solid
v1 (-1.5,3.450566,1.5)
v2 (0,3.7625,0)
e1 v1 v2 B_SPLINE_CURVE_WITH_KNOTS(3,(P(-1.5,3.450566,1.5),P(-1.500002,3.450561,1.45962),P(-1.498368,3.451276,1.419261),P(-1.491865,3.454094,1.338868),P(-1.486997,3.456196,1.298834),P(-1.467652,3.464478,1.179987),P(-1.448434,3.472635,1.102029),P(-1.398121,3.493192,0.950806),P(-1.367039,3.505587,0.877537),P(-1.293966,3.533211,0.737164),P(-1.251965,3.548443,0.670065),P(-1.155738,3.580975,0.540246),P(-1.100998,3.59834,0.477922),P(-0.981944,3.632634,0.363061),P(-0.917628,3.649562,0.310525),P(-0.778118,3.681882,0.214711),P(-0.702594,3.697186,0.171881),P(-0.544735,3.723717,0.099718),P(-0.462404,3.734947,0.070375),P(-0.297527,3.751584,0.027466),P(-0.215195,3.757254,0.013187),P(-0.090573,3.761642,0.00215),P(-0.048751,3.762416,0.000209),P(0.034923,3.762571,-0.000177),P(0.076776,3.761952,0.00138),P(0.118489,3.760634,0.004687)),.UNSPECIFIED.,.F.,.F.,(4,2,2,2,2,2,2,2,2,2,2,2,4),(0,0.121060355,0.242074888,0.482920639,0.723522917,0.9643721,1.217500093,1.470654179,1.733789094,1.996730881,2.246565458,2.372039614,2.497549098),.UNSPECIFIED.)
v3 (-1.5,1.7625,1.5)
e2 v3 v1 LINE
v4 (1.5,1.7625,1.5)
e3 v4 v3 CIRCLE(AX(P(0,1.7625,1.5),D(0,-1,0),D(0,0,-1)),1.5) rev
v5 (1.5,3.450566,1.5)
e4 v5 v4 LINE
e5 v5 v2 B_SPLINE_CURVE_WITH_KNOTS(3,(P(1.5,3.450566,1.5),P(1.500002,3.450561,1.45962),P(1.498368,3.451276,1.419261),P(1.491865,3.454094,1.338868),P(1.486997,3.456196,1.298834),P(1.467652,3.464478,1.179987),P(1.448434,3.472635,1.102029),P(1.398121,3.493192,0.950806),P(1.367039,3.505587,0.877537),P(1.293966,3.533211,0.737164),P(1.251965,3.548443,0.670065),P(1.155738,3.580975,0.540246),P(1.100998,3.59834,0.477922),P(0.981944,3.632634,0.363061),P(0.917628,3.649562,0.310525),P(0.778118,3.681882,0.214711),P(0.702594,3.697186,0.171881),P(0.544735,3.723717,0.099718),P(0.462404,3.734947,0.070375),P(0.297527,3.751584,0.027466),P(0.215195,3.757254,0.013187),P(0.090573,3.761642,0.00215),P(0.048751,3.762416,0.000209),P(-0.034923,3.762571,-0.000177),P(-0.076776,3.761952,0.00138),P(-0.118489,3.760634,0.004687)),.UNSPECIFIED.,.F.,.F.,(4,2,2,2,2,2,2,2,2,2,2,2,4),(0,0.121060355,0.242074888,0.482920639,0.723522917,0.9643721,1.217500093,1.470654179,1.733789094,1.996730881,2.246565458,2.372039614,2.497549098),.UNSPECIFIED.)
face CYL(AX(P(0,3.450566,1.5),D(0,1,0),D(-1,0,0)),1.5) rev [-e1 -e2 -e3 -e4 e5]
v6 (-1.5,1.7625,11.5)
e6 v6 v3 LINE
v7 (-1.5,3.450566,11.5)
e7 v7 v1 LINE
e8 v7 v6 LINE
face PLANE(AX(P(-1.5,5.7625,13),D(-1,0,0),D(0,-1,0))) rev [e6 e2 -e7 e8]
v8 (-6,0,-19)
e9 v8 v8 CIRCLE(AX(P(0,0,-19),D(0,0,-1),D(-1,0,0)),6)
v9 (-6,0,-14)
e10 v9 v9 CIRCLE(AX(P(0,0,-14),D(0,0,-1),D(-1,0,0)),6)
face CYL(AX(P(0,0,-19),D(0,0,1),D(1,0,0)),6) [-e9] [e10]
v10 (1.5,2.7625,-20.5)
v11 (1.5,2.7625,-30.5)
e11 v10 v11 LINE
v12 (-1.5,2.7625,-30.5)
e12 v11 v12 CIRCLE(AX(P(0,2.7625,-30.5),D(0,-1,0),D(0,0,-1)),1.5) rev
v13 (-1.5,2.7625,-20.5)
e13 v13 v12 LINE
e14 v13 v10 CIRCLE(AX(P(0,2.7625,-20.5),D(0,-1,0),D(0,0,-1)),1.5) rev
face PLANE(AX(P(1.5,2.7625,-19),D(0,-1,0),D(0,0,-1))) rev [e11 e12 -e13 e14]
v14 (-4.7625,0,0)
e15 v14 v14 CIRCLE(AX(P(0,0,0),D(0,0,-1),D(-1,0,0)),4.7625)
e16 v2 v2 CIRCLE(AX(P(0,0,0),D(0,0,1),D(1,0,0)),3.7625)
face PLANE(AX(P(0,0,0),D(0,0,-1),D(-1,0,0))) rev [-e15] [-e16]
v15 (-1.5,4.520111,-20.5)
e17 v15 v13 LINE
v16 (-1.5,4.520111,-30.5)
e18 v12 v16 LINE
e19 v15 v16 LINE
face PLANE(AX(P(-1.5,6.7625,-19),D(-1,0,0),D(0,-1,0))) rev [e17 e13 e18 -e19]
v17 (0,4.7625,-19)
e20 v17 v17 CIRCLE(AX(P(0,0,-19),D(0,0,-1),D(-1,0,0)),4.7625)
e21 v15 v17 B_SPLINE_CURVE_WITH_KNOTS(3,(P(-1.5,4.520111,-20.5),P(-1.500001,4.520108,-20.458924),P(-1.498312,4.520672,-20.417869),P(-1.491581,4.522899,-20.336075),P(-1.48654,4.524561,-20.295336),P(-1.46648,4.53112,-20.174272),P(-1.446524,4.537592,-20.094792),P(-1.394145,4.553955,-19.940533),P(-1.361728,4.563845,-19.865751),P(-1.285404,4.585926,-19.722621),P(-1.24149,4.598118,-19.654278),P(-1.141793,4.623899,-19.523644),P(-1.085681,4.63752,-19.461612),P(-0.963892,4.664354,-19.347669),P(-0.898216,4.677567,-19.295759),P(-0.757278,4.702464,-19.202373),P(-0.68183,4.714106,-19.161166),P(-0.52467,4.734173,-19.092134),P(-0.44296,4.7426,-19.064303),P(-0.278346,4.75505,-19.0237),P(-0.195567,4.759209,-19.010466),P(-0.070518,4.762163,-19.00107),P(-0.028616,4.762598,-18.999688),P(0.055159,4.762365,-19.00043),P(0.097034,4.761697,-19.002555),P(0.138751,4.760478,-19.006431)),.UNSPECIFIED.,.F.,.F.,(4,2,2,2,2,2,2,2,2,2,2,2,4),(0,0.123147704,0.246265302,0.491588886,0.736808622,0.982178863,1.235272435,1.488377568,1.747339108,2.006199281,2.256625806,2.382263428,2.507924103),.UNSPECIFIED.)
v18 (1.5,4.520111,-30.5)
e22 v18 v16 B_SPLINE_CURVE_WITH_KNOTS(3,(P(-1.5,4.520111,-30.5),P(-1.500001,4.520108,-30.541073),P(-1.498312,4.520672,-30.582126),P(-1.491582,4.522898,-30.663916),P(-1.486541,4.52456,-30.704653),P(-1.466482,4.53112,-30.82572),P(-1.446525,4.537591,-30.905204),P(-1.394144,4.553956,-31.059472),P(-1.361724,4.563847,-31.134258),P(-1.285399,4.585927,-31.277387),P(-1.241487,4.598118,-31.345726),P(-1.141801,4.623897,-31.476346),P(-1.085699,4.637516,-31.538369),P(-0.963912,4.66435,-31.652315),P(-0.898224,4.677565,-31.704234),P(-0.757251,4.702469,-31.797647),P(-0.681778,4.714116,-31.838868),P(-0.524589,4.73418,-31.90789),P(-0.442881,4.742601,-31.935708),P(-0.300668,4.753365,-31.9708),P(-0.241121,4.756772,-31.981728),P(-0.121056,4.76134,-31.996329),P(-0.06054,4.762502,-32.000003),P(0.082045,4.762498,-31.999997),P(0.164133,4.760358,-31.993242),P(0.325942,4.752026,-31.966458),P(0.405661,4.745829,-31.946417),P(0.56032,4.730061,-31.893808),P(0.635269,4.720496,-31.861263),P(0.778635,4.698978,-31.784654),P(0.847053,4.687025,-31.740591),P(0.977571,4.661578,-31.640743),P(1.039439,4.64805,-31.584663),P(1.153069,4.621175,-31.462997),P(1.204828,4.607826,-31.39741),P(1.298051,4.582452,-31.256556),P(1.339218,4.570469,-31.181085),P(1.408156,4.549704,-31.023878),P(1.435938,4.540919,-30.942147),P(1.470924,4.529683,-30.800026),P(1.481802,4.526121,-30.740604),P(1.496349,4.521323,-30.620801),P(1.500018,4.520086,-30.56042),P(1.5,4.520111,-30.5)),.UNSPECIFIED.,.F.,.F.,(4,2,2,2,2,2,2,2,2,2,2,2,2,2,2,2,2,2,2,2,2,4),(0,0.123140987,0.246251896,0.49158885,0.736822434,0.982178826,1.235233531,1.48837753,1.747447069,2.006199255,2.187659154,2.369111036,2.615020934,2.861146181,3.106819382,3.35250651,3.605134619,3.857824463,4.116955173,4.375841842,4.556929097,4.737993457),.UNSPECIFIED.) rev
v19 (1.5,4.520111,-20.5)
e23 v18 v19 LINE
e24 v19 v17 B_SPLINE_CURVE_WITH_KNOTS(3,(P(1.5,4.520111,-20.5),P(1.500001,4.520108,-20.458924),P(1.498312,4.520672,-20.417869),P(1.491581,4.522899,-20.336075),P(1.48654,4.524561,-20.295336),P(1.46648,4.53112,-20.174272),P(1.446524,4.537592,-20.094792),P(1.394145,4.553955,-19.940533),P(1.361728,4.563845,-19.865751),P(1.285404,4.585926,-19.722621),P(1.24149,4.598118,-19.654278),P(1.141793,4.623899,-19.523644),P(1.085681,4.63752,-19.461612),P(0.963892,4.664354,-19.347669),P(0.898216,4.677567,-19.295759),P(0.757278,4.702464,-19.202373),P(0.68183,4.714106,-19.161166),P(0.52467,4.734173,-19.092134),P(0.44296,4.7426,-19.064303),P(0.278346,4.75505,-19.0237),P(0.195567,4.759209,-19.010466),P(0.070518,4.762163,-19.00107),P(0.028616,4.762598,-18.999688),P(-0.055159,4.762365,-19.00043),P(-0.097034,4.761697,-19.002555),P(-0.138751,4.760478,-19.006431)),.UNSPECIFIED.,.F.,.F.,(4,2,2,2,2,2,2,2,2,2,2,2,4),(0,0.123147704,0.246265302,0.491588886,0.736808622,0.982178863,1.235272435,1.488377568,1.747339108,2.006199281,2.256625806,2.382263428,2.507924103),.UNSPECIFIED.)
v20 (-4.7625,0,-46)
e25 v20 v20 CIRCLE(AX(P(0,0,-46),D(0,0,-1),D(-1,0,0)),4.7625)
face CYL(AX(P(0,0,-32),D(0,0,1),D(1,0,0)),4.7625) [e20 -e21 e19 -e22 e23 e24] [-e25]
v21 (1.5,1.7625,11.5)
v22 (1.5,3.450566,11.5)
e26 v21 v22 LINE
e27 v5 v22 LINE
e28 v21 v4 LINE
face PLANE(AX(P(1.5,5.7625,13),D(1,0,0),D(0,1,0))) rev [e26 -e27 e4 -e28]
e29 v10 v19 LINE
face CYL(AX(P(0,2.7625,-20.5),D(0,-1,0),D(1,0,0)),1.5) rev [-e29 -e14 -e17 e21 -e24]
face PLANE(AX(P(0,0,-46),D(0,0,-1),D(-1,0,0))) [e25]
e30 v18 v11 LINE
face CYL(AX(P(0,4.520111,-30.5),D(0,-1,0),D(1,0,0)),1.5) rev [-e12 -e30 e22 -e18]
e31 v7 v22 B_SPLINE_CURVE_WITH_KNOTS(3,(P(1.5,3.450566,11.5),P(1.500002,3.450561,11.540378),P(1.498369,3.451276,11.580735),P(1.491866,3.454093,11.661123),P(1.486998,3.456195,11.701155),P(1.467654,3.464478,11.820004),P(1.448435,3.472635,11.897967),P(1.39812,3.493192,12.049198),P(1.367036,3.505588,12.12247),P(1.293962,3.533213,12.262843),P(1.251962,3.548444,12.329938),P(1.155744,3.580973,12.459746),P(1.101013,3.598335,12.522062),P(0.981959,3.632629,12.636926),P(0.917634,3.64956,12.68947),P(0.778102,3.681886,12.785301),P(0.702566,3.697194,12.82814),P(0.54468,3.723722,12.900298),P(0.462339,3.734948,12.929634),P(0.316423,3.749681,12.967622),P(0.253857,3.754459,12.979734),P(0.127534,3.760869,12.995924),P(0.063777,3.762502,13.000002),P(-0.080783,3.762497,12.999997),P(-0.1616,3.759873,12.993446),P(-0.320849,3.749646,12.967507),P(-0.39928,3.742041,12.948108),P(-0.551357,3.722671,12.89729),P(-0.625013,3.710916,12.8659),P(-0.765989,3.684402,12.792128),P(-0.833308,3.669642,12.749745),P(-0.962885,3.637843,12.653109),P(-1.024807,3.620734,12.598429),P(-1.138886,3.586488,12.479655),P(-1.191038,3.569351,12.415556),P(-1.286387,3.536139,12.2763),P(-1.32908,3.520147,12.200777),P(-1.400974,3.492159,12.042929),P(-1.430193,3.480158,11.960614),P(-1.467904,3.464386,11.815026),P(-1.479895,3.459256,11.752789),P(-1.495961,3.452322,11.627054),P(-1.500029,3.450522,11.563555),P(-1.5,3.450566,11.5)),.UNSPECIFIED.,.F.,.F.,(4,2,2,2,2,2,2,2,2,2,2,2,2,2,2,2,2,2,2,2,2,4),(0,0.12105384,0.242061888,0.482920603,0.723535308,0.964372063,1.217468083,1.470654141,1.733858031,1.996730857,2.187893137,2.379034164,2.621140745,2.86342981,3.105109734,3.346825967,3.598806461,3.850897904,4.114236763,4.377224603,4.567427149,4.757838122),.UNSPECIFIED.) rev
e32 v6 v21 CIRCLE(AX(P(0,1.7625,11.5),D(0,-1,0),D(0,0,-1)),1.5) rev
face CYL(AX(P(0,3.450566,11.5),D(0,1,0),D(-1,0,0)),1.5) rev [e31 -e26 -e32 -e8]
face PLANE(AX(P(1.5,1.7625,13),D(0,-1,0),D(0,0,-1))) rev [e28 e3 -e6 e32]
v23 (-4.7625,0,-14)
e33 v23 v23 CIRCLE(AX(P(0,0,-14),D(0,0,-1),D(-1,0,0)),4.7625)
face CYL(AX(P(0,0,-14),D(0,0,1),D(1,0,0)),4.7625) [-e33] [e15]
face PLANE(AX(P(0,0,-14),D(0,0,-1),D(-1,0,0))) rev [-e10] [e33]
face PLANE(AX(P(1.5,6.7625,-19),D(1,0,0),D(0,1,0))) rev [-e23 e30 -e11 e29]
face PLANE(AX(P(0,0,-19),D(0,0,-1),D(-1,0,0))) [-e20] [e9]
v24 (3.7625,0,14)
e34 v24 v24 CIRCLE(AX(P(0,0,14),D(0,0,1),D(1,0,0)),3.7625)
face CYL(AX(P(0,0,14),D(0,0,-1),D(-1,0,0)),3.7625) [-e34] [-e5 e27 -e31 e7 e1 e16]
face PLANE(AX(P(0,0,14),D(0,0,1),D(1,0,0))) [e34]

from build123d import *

# Parameters (mm, degrees)
SKETCH1_R               = 3.7625
PART1_DEPTH             = 14
SKETCH3_W               = 3
SKETCH3_H               = 4
KEYWAY1_DEPTH           = 13
SKETCH4_R               = 4.7625
PART2_BALLBEARING_DEPTH = 14
KEYWAY1_A_R             = 1.5
KEYWAY1_B_R             = 1.5
SKETCH6_R               = 6
PART3_DEPTH             = 5
SKETCH7_R               = 4.7625
PART4_DEPTH             = 13
SKETCH8_W               = 3
SKETCH8_H               = 4
KEYWAY2_DEPTH           = 13
SKETCH9_R               = 4.7625
PART5_BALLBEARING_DEPTH = 14
FILLET1_R               = 1.5
FILLET2_R               = 1.5


# Some blends are built 0.0001 mm under size
with BuildPart() as part:
    # Sketch1 → Part1 (new body)
    with BuildSketch(Plane.XY):
        Circle(SKETCH1_R)
    extrude(amount=PART1_DEPTH)

    # Sketch3 → Keyway1 (cut)
    with BuildSketch(Plane(origin=(0, 0, 0), x_dir=(-1, 0, 0), z_dir=(0, 0, -1))):
        with Locations((0, 3.7625)):
            Rectangle(SKETCH3_W, SKETCH3_H)
    extrude(amount=-KEYWAY1_DEPTH, mode=Mode.SUBTRACT)

    # Sketch4 → Part2_BallBearing (add)
    with BuildSketch(Plane(origin=(0, 0, 0), x_dir=(-1, 0, 0), z_dir=(0, 0, -1))):
        Circle(SKETCH4_R)
    extrude(amount=PART2_BALLBEARING_DEPTH)

    # Keyway1_a
    # the kernel refuses this fillet: 1.5 mm, written as the material it adds along each edge
    with BuildSketch(Plane(origin=(1.5, -1.9875, 0), x_dir=(-1, 0, 0), z_dir=(0, 1, 0))) as keyway1_a_piece_1_section:
        with BuildLine():
            CenterArc((KEYWAY1_A_R, KEYWAY1_A_R), KEYWAY1_A_R, 180, 90)
            Line((0, KEYWAY1_A_R), (0, 0))
            Line((0, 0), (KEYWAY1_A_R, 0))
        make_face()
    keyway1_a_piece_1 = extrude(amount=9.188066, mode=Mode.PRIVATE)
    keyway1_a_piece_1 = keyway1_a_piece_1 & Plane(origin=(0, 0, 0.327266), x_dir=(1, 0, 0), z_dir=(0, 0, -1)) * Cylinder(3.7625, 25, mode=Mode.PRIVATE)
    add(keyway1_a_piece_1)
    with BuildSketch(Plane(origin=(-1.5, 7.200566, 0), x_dir=(1, 0, 0), z_dir=(0, -1, 0))) as keyway1_a_piece_2_section:
        with BuildLine():
            CenterArc((KEYWAY1_A_R, KEYWAY1_A_R), KEYWAY1_A_R, 180, 90)
            Line((0, KEYWAY1_A_R), (0, 0))
            Line((0, 0), (KEYWAY1_A_R, 0))
        make_face()
    keyway1_a_piece_2 = extrude(amount=9.188066, mode=Mode.PRIVATE)
    keyway1_a_piece_2 = keyway1_a_piece_2 & Plane(origin=(0, 0, 0.327266), x_dir=(1, 0, 0), z_dir=(0, 0, -1)) * Cylinder(3.7625, 25, mode=Mode.PRIVATE)
    add(keyway1_a_piece_2)

    # Keyway1_b
    keyway1_b_edges = [part.edges().sort_by_distance(p)[0] for p in [
        (1.5, 2.606533, 13),
        (-1.5, 2.606533, 13),
    ]]
    fillet(keyway1_b_edges, radius=KEYWAY1_B_R - 0.0001)  # a hair under: the kernel refuses the full size

    # Sketch6 → Part3 (add)
    with BuildSketch(Plane(origin=(0, 0, -14), x_dir=(-1, 0, 0), z_dir=(0, 0, -1))):
        Circle(SKETCH6_R)
    extrude(amount=PART3_DEPTH)

    # Sketch7 → Part4 (add)
    with BuildSketch(Plane(origin=(0, 0, -19), x_dir=(-1, 0, 0), z_dir=(0, 0, -1))):
        Circle(SKETCH7_R)
    extrude(amount=PART4_DEPTH)

    # Sketch8 → KeyWay2 (cut)
    with BuildSketch(Plane(origin=(0, 0, -32), x_dir=(-1, 0, 0), z_dir=(0, 0, -1))):
        with Locations((0, 4.7625)):
            Rectangle(SKETCH8_W, SKETCH8_H)
    extrude(amount=-KEYWAY2_DEPTH, mode=Mode.SUBTRACT)

    # Sketch9 → Part5__BallBearing (add)
    with BuildSketch(Plane(origin=(0, 0, -32), x_dir=(-1, 0, 0), z_dir=(0, 0, -1))):
        Circle(SKETCH9_R)
    extrude(amount=PART5_BALLBEARING_DEPTH)

    # Fillet1
    # the kernel refuses this fillet: 1.5 mm, written as the material it adds along each edge
    with BuildSketch(Plane(origin=(1.5, -0.9875, -19), x_dir=(-1, 0, 0), z_dir=(0, 1, 0))) as fillet1_piece_1_section:
        with BuildLine():
            CenterArc((FILLET1_R, -FILLET1_R), FILLET1_R, 90, 90)
            Line((0, -FILLET1_R), (0, 0))
            Line((0, 0), (FILLET1_R, 0))
        make_face()
    fillet1_piece_1 = extrude(amount=9.257611, mode=Mode.PRIVATE)
    fillet1_piece_1 = fillet1_piece_1 & Plane(origin=(0, 0, -19.329162), x_dir=(-1, 0, 0), z_dir=(0, 0, 1)) * Cylinder(4.7625, 25, mode=Mode.PRIVATE)
    add(fillet1_piece_1)
    with BuildSketch(Plane(origin=(-1.5, 8.270111, -19), x_dir=(1, 0, 0), z_dir=(0, -1, 0))) as fillet1_piece_2_section:
        with BuildLine():
            CenterArc((FILLET1_R, -FILLET1_R), FILLET1_R, 90, 90)
            Line((0, -FILLET1_R), (0, 0))
            Line((0, 0), (FILLET1_R, 0))
        make_face()
    fillet1_piece_2 = extrude(amount=9.257611, mode=Mode.PRIVATE)
    fillet1_piece_2 = fillet1_piece_2 & Plane(origin=(0, 0, -19.329163), x_dir=(-1, 0, 0), z_dir=(0, 0, 1)) * Cylinder(4.7625, 25, mode=Mode.PRIVATE)
    add(fillet1_piece_2)

    # Fillet2
    # the kernel refuses this fillet: 1.5 mm, written as the material it adds along each edge
    with BuildSketch(Plane(origin=(1.5, -0.9875, -32), x_dir=(-1, 0, 0), z_dir=(0, 1, 0))) as fillet2_piece_1_section:
        with BuildLine():
            CenterArc((FILLET2_R, FILLET2_R), FILLET2_R, 180, 90)
            Line((0, FILLET2_R), (0, 0))
            Line((0, 0), (FILLET2_R, 0))
        make_face()
    fillet2_piece_1 = extrude(amount=9.257611, mode=Mode.PRIVATE)
    fillet2_piece_1 = fillet2_piece_1 & Plane(origin=(0, 0, -31.660407), x_dir=(-1, 0, 0), z_dir=(0, 0, 1)) * Cylinder(4.7625, 25, mode=Mode.PRIVATE)
    add(fillet2_piece_1)
    with BuildSketch(Plane(origin=(-1.5, 8.270111, -32), x_dir=(0, 0, 1), z_dir=(0, -1, 0))) as fillet2_piece_2_section:
        with BuildLine():
            CenterArc((FILLET2_R, -FILLET2_R), FILLET2_R, 90, 90)
            Line((0, -FILLET2_R), (0, 0))
            Line((0, 0), (FILLET2_R, 0))
        make_face()
    fillet2_piece_2 = extrude(amount=9.257611, mode=Mode.PRIVATE)
    fillet2_piece_2 = fillet2_piece_2 & Plane(origin=(0, 0, -31.668087), x_dir=(-1, 0, 0), z_dir=(0, 0, 1)) * Cylinder(4.7625, 25, mode=Mode.PRIVATE)
    add(fillet2_piece_2)


solid = part.part
